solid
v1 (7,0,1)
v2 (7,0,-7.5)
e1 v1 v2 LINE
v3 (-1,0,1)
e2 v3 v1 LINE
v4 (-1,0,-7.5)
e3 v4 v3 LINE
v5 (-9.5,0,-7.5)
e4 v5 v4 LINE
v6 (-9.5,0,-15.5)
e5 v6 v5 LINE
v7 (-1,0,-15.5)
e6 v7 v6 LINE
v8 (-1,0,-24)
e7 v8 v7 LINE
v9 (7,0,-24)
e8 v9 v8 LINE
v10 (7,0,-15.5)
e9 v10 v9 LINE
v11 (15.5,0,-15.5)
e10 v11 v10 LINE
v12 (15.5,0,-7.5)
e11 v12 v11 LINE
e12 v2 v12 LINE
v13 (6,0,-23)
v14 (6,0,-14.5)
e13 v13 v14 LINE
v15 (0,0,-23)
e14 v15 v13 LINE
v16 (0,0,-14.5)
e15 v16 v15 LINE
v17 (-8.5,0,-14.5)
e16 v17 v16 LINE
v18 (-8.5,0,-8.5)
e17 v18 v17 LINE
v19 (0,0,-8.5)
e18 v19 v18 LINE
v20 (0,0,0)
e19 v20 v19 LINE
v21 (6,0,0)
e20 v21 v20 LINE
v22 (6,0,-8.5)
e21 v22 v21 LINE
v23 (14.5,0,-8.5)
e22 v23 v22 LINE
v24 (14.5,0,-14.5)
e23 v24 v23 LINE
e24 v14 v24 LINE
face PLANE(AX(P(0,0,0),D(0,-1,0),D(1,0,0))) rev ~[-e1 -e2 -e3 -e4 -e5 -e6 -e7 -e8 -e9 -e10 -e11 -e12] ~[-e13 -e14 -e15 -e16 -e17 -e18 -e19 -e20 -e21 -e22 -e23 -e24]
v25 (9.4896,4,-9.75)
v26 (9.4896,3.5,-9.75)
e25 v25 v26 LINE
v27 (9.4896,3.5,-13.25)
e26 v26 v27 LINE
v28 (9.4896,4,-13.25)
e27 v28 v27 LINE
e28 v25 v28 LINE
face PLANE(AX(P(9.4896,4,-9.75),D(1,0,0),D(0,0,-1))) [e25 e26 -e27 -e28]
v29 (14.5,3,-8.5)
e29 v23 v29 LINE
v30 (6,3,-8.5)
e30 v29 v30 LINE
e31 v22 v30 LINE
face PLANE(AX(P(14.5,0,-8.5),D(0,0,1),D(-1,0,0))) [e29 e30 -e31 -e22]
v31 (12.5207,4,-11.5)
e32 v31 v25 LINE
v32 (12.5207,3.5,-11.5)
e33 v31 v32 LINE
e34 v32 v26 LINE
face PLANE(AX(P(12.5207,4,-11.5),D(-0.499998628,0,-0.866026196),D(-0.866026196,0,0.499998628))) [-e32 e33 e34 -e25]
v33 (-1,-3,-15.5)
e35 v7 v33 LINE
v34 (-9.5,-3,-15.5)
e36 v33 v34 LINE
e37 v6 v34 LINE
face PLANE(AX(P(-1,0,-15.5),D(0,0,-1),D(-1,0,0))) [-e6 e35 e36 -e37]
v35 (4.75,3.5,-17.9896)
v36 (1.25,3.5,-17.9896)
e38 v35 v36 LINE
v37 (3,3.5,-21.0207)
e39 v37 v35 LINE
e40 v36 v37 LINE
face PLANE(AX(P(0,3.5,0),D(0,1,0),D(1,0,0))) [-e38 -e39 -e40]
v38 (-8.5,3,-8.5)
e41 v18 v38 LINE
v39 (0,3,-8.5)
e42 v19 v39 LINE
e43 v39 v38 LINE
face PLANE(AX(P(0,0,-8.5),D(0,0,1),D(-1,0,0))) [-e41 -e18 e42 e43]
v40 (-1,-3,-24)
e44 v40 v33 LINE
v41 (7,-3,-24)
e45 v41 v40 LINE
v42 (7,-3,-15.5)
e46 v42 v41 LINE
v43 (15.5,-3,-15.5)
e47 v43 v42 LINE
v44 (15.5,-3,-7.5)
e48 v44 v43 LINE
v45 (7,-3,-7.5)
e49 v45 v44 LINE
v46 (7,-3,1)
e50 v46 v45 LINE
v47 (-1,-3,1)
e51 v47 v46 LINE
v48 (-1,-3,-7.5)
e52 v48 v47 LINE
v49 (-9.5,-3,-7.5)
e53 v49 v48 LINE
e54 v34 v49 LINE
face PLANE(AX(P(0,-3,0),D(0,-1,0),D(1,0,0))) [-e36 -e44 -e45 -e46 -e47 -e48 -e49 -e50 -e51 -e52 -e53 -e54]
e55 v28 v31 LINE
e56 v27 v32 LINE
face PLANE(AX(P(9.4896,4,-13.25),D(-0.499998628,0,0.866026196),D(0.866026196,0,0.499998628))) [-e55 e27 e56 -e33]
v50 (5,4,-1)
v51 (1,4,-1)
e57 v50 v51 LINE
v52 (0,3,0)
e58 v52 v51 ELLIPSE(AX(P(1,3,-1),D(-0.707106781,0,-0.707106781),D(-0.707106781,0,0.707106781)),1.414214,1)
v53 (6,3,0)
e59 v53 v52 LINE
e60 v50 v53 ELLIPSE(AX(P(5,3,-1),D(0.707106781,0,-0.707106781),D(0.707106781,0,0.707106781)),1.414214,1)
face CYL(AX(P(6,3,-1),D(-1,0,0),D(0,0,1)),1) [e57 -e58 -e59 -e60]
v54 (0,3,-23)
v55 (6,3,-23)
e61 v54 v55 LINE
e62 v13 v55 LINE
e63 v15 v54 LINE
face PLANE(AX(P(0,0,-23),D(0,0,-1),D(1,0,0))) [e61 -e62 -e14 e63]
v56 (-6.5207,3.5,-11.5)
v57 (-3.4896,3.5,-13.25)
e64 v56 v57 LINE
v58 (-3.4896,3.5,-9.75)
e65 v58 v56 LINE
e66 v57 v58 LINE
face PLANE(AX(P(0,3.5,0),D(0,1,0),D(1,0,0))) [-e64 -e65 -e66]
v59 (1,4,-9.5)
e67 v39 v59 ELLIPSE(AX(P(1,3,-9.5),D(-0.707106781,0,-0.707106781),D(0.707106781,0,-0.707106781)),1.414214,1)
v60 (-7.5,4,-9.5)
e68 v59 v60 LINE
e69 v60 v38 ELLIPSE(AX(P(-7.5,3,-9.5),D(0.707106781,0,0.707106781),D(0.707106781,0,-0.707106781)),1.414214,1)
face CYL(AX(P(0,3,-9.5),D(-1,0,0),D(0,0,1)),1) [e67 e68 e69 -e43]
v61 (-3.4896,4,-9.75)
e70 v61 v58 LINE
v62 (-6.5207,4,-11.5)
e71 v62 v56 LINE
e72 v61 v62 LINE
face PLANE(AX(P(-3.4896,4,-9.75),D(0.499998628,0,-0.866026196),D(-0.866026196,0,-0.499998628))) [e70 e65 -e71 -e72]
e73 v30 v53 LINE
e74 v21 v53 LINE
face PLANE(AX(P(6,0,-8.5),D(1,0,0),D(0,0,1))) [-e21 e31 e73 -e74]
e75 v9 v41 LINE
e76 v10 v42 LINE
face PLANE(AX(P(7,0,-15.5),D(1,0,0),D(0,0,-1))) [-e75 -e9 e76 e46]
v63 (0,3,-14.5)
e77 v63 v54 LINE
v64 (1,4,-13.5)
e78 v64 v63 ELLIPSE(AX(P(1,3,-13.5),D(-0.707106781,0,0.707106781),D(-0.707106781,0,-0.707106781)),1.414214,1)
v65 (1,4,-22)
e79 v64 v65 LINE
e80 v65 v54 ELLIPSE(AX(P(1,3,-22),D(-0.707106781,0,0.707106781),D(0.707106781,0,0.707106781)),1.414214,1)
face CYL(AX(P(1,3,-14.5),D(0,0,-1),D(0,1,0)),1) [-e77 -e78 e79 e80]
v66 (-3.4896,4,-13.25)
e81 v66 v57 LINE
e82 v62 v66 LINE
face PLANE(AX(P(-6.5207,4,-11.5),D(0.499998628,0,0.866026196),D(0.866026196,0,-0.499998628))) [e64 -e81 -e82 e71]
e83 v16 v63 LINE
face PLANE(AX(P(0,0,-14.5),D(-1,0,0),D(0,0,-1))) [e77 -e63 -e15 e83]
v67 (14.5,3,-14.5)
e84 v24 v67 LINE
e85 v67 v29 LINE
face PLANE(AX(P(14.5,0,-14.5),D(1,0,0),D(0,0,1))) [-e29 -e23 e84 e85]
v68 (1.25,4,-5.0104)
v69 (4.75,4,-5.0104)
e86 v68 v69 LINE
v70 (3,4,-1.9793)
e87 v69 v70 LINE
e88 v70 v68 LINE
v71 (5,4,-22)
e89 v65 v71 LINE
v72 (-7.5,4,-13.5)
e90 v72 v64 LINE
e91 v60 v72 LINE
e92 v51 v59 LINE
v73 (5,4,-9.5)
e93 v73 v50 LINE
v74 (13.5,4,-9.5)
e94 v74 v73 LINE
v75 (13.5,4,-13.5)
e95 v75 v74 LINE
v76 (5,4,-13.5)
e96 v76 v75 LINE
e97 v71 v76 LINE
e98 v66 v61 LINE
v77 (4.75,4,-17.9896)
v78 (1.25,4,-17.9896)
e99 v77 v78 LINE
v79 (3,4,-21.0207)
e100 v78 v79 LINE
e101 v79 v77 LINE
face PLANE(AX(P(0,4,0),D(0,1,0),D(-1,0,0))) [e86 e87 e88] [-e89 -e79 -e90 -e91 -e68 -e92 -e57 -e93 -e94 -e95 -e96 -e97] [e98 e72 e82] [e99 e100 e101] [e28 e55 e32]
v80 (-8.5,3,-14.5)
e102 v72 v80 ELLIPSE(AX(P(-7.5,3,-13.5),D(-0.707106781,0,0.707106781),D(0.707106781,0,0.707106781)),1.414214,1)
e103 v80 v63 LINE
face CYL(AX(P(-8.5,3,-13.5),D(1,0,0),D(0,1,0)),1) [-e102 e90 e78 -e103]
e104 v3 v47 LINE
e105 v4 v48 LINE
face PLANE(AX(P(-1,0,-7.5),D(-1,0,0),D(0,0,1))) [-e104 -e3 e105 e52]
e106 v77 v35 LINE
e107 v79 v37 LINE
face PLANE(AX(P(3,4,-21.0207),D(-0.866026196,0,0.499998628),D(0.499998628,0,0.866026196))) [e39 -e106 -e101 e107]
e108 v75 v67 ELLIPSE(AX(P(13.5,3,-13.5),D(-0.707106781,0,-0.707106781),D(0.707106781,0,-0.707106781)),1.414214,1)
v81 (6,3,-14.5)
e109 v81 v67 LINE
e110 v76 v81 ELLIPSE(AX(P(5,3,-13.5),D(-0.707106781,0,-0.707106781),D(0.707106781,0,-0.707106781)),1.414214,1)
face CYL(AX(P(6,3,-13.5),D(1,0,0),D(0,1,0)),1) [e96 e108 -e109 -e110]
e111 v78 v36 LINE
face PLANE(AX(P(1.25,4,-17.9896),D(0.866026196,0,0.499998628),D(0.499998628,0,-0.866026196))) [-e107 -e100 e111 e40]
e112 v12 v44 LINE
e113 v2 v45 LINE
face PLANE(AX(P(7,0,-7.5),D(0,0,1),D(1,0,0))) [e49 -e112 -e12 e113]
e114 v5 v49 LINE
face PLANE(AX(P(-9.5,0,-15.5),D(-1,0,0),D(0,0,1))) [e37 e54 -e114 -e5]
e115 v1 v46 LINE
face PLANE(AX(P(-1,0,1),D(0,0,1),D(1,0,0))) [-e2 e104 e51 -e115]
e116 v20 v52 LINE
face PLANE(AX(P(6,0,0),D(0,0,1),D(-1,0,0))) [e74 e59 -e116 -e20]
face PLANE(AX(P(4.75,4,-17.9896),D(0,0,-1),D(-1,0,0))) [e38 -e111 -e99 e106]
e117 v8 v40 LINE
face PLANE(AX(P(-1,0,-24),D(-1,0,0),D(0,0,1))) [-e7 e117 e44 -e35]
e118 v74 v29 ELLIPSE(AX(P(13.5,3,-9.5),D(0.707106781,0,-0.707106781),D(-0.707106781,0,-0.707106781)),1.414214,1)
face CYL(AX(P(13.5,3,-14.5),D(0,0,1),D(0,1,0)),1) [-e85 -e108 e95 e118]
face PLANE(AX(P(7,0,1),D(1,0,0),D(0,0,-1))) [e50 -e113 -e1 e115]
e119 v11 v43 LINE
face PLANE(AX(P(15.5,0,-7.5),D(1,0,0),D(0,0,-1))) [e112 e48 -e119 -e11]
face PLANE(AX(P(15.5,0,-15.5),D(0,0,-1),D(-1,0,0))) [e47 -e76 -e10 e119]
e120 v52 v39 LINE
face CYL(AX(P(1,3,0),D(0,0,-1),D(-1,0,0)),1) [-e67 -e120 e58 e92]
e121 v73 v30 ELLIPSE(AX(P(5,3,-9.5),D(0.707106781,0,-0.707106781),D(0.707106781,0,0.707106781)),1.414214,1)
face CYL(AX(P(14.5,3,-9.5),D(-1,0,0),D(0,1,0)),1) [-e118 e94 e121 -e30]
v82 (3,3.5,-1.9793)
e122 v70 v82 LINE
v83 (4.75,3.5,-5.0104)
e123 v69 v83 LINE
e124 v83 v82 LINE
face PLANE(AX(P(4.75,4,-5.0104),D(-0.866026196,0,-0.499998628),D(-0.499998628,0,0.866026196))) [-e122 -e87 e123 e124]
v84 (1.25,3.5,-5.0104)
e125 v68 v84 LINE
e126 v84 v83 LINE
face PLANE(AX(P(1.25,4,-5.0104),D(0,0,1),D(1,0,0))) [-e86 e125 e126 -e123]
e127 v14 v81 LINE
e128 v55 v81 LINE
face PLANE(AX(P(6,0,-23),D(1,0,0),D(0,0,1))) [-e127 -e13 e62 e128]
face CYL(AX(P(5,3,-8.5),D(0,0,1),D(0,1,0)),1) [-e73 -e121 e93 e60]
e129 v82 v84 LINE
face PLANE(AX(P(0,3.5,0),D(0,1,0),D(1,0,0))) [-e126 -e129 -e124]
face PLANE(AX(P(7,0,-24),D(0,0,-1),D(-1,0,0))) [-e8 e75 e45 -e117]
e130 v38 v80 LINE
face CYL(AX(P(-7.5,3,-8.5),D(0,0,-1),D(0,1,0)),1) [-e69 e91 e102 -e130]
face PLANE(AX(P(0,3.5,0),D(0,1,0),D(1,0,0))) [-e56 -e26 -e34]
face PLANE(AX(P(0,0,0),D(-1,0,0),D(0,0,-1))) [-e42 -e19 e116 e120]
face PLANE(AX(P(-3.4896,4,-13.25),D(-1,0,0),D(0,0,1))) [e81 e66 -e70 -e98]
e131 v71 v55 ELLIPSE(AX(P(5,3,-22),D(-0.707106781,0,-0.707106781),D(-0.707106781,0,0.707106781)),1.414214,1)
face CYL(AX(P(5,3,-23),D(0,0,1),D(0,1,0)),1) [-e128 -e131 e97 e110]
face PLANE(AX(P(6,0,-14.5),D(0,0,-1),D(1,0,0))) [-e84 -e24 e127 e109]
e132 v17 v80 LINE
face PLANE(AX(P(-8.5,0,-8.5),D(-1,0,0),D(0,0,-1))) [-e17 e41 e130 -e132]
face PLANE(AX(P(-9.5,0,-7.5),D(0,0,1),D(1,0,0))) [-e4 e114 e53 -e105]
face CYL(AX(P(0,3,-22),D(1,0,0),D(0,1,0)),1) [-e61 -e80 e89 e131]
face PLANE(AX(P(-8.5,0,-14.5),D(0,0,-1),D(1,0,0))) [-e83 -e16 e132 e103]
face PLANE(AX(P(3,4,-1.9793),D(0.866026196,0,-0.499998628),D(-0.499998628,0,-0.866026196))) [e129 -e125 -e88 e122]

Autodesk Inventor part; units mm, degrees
ref_plane "YZ Plane" through (0, 0, 0) normal (1, 0, 0) x (0, 1, 0)
ref_plane "XZ Plane" through (0, 0, 0) normal (0, 1, 0) x (-1, 0, 0)
ref_plane "XY Plane" through (0, 0, 0) normal (0, 0, 1) x (1, 0, 0)
sketch "Skizze1" plane through (0, 0, 0) normal (0, 1, 0) x (-1, 0, 0)
  line L0 (0, 0) -> (0, -8.5)
  line L1 (0, -8.5) -> (8.5, -8.5)
  line L2 (8.5, -8.5) -> (8.5, -14.5)
  line L3 (8.5, -14.5) -> (0, -14.5)
  line L4 (0, -14.5) -> (0, -23)
  line L5 (0, -23) -> (-6, -23)
  line L6 (-6, -23) -> (-6, -14.5)
  line L7 (-6, -14.5) -> (-14.5, -14.5)
  line L8 (-14.5, -14.5) -> (-14.5, -8.5)
  line L9 (-14.5, -8.5) -> (-6, -8.5)
  line L10 (-6, 0) -> (0, 0)
  line L11 (-6, -8.5) -> (-6, 0)
  dimension "d0" = 23
  dimension "d1" = 23
  dimension "d2" = 6
  dimension "d3" = 6
  dimension "d4" = 8.5
  dimension "d5" = 8.5
  dimension "d6" = 8.5
extrude "Extrusion1" add sketch "Skizze1" along normal blind 4
sketch "Skizze2" plane through (0, 4, 0) normal (0, 1, 0) x (1, 0, 0)
  line L0 (3, 1.9793) -> (1.25, 5.0104)
  line L1 (1.25, 5.0104) -> (4.75, 5.0104)
  line L2 (4.75, 5.0104) -> (3, 1.9793)
  line L3 (6, 23) -> (0, 23) projected
  line L4 (0, 0) -> (6, 0) projected
  line L5 (3, 21.0207) -> (4.75, 17.9896)
  line L6 (4.75, 17.9896) -> (1.25, 17.9896)
  line L7 (1.25, 17.9896) -> (3, 21.0207)
  line L8 (-6.5207, 11.5) -> (-3.4896, 13.25)
  line L9 (-3.4896, 13.25) -> (-3.4896, 9.75)
  line L10 (-3.4896, 9.75) -> (-6.5207, 11.5)
  line L11 (12.5207, 11.5) -> (9.4896, 9.75)
  line L12 (9.4896, 9.75) -> (9.4896, 13.25)
  line L13 (9.4896, 13.25) -> (12.5207, 11.5)
  line L14 (-8.5, 14.5) -> (-8.5, 8.5) projected
  line L15 (14.5, 8.5) -> (14.5, 14.5) projected
  point P0 (3, 4)
  point P1 (3, 19)
  point P2 (-4.5, 11.5)
  point P3 (10.5, 11.5)
  dimension "d9" = 4
  dimension "d10" = 3
  dimension "d11" = 4
  dimension "d12" = 4
  dimension "d13" = 4
  dimension "d14" = 3
  dimension "d15" = 3
  dimension "d16" = 3
  dimension "d17" = 3.5
  dimension "d18" = 3.5
  dimension "d19" = 3.5
  dimension "d20" = 3.5
extrude "Extrusion2" cut sketch "Skizze2" against normal blind 0.5
fillet "Rundung1" radius 1 12 edges at (6, 4, -4.25) (3, 4, 0) (0, 4, -4.25) (10.25, 4, -8.5) (10.25, 4, -14.5) (14.5, 4, -11.5) (6, 4, -18.75) (3, 4, -23) (0, 4, -18.75) (-4.25, 4, -14.5) (-8.5, 4, -11.5) (-4.25, 4, -8.5)
sketch "Skizze3" plane through (0, 0, 0) normal (0, -1, 0) x (1, 0, 0)
  line L0 (15.5, -15.5) -> (7, -15.5)
  line L1 (7, -15.5) -> (7, -24)
  line L2 (7, -24) -> (-1, -24)
  line L3 (-1, -24) -> (-1, -15.5)
  line L4 (-1, -15.5) -> (-9.5, -15.5)
  line L5 (-9.5, -15.5) -> (-9.5, -7.5)
  line L6 (-9.5, -7.5) -> (-1, -7.5)
  line L7 (-1, -7.5) -> (-1, 1)
  line L8 (-1, 1) -> (7, 1)
  line L9 (7, 1) -> (7, -7.5)
  line L10 (14.5, -8.5) -> (6, -8.5) projected
  line L11 (7, -7.5) -> (15.5, -7.5)
  line L12 (15.5, -7.5) -> (15.5, -15.5)
  point P0 (0, 0)
  point P1 (14.5, -14.5)
  point P2 (6, -23)
  point P3 (-8.5, -8.5)
  point P4 (0, -8.5)
  point P5 (6, 0)
  dimension "d25" = 8.5
  dimension "d26" = 25
  dimension "d27" = 25
  dimension "d28" = 8
  dimension "d29" = 8
  dimension "d30" = 8
  dimension "d31" = 8
  dimension "d32" = 8.5
  dimension "d33" = 8.5
  dimension "d34" = 8.5
  dimension "d35" = 8.5
  dimension "d36" = 8.5
extrude "Extrusion3" add sketch "Skizze3" along normal blind 3
properties part number "Kreuz"
